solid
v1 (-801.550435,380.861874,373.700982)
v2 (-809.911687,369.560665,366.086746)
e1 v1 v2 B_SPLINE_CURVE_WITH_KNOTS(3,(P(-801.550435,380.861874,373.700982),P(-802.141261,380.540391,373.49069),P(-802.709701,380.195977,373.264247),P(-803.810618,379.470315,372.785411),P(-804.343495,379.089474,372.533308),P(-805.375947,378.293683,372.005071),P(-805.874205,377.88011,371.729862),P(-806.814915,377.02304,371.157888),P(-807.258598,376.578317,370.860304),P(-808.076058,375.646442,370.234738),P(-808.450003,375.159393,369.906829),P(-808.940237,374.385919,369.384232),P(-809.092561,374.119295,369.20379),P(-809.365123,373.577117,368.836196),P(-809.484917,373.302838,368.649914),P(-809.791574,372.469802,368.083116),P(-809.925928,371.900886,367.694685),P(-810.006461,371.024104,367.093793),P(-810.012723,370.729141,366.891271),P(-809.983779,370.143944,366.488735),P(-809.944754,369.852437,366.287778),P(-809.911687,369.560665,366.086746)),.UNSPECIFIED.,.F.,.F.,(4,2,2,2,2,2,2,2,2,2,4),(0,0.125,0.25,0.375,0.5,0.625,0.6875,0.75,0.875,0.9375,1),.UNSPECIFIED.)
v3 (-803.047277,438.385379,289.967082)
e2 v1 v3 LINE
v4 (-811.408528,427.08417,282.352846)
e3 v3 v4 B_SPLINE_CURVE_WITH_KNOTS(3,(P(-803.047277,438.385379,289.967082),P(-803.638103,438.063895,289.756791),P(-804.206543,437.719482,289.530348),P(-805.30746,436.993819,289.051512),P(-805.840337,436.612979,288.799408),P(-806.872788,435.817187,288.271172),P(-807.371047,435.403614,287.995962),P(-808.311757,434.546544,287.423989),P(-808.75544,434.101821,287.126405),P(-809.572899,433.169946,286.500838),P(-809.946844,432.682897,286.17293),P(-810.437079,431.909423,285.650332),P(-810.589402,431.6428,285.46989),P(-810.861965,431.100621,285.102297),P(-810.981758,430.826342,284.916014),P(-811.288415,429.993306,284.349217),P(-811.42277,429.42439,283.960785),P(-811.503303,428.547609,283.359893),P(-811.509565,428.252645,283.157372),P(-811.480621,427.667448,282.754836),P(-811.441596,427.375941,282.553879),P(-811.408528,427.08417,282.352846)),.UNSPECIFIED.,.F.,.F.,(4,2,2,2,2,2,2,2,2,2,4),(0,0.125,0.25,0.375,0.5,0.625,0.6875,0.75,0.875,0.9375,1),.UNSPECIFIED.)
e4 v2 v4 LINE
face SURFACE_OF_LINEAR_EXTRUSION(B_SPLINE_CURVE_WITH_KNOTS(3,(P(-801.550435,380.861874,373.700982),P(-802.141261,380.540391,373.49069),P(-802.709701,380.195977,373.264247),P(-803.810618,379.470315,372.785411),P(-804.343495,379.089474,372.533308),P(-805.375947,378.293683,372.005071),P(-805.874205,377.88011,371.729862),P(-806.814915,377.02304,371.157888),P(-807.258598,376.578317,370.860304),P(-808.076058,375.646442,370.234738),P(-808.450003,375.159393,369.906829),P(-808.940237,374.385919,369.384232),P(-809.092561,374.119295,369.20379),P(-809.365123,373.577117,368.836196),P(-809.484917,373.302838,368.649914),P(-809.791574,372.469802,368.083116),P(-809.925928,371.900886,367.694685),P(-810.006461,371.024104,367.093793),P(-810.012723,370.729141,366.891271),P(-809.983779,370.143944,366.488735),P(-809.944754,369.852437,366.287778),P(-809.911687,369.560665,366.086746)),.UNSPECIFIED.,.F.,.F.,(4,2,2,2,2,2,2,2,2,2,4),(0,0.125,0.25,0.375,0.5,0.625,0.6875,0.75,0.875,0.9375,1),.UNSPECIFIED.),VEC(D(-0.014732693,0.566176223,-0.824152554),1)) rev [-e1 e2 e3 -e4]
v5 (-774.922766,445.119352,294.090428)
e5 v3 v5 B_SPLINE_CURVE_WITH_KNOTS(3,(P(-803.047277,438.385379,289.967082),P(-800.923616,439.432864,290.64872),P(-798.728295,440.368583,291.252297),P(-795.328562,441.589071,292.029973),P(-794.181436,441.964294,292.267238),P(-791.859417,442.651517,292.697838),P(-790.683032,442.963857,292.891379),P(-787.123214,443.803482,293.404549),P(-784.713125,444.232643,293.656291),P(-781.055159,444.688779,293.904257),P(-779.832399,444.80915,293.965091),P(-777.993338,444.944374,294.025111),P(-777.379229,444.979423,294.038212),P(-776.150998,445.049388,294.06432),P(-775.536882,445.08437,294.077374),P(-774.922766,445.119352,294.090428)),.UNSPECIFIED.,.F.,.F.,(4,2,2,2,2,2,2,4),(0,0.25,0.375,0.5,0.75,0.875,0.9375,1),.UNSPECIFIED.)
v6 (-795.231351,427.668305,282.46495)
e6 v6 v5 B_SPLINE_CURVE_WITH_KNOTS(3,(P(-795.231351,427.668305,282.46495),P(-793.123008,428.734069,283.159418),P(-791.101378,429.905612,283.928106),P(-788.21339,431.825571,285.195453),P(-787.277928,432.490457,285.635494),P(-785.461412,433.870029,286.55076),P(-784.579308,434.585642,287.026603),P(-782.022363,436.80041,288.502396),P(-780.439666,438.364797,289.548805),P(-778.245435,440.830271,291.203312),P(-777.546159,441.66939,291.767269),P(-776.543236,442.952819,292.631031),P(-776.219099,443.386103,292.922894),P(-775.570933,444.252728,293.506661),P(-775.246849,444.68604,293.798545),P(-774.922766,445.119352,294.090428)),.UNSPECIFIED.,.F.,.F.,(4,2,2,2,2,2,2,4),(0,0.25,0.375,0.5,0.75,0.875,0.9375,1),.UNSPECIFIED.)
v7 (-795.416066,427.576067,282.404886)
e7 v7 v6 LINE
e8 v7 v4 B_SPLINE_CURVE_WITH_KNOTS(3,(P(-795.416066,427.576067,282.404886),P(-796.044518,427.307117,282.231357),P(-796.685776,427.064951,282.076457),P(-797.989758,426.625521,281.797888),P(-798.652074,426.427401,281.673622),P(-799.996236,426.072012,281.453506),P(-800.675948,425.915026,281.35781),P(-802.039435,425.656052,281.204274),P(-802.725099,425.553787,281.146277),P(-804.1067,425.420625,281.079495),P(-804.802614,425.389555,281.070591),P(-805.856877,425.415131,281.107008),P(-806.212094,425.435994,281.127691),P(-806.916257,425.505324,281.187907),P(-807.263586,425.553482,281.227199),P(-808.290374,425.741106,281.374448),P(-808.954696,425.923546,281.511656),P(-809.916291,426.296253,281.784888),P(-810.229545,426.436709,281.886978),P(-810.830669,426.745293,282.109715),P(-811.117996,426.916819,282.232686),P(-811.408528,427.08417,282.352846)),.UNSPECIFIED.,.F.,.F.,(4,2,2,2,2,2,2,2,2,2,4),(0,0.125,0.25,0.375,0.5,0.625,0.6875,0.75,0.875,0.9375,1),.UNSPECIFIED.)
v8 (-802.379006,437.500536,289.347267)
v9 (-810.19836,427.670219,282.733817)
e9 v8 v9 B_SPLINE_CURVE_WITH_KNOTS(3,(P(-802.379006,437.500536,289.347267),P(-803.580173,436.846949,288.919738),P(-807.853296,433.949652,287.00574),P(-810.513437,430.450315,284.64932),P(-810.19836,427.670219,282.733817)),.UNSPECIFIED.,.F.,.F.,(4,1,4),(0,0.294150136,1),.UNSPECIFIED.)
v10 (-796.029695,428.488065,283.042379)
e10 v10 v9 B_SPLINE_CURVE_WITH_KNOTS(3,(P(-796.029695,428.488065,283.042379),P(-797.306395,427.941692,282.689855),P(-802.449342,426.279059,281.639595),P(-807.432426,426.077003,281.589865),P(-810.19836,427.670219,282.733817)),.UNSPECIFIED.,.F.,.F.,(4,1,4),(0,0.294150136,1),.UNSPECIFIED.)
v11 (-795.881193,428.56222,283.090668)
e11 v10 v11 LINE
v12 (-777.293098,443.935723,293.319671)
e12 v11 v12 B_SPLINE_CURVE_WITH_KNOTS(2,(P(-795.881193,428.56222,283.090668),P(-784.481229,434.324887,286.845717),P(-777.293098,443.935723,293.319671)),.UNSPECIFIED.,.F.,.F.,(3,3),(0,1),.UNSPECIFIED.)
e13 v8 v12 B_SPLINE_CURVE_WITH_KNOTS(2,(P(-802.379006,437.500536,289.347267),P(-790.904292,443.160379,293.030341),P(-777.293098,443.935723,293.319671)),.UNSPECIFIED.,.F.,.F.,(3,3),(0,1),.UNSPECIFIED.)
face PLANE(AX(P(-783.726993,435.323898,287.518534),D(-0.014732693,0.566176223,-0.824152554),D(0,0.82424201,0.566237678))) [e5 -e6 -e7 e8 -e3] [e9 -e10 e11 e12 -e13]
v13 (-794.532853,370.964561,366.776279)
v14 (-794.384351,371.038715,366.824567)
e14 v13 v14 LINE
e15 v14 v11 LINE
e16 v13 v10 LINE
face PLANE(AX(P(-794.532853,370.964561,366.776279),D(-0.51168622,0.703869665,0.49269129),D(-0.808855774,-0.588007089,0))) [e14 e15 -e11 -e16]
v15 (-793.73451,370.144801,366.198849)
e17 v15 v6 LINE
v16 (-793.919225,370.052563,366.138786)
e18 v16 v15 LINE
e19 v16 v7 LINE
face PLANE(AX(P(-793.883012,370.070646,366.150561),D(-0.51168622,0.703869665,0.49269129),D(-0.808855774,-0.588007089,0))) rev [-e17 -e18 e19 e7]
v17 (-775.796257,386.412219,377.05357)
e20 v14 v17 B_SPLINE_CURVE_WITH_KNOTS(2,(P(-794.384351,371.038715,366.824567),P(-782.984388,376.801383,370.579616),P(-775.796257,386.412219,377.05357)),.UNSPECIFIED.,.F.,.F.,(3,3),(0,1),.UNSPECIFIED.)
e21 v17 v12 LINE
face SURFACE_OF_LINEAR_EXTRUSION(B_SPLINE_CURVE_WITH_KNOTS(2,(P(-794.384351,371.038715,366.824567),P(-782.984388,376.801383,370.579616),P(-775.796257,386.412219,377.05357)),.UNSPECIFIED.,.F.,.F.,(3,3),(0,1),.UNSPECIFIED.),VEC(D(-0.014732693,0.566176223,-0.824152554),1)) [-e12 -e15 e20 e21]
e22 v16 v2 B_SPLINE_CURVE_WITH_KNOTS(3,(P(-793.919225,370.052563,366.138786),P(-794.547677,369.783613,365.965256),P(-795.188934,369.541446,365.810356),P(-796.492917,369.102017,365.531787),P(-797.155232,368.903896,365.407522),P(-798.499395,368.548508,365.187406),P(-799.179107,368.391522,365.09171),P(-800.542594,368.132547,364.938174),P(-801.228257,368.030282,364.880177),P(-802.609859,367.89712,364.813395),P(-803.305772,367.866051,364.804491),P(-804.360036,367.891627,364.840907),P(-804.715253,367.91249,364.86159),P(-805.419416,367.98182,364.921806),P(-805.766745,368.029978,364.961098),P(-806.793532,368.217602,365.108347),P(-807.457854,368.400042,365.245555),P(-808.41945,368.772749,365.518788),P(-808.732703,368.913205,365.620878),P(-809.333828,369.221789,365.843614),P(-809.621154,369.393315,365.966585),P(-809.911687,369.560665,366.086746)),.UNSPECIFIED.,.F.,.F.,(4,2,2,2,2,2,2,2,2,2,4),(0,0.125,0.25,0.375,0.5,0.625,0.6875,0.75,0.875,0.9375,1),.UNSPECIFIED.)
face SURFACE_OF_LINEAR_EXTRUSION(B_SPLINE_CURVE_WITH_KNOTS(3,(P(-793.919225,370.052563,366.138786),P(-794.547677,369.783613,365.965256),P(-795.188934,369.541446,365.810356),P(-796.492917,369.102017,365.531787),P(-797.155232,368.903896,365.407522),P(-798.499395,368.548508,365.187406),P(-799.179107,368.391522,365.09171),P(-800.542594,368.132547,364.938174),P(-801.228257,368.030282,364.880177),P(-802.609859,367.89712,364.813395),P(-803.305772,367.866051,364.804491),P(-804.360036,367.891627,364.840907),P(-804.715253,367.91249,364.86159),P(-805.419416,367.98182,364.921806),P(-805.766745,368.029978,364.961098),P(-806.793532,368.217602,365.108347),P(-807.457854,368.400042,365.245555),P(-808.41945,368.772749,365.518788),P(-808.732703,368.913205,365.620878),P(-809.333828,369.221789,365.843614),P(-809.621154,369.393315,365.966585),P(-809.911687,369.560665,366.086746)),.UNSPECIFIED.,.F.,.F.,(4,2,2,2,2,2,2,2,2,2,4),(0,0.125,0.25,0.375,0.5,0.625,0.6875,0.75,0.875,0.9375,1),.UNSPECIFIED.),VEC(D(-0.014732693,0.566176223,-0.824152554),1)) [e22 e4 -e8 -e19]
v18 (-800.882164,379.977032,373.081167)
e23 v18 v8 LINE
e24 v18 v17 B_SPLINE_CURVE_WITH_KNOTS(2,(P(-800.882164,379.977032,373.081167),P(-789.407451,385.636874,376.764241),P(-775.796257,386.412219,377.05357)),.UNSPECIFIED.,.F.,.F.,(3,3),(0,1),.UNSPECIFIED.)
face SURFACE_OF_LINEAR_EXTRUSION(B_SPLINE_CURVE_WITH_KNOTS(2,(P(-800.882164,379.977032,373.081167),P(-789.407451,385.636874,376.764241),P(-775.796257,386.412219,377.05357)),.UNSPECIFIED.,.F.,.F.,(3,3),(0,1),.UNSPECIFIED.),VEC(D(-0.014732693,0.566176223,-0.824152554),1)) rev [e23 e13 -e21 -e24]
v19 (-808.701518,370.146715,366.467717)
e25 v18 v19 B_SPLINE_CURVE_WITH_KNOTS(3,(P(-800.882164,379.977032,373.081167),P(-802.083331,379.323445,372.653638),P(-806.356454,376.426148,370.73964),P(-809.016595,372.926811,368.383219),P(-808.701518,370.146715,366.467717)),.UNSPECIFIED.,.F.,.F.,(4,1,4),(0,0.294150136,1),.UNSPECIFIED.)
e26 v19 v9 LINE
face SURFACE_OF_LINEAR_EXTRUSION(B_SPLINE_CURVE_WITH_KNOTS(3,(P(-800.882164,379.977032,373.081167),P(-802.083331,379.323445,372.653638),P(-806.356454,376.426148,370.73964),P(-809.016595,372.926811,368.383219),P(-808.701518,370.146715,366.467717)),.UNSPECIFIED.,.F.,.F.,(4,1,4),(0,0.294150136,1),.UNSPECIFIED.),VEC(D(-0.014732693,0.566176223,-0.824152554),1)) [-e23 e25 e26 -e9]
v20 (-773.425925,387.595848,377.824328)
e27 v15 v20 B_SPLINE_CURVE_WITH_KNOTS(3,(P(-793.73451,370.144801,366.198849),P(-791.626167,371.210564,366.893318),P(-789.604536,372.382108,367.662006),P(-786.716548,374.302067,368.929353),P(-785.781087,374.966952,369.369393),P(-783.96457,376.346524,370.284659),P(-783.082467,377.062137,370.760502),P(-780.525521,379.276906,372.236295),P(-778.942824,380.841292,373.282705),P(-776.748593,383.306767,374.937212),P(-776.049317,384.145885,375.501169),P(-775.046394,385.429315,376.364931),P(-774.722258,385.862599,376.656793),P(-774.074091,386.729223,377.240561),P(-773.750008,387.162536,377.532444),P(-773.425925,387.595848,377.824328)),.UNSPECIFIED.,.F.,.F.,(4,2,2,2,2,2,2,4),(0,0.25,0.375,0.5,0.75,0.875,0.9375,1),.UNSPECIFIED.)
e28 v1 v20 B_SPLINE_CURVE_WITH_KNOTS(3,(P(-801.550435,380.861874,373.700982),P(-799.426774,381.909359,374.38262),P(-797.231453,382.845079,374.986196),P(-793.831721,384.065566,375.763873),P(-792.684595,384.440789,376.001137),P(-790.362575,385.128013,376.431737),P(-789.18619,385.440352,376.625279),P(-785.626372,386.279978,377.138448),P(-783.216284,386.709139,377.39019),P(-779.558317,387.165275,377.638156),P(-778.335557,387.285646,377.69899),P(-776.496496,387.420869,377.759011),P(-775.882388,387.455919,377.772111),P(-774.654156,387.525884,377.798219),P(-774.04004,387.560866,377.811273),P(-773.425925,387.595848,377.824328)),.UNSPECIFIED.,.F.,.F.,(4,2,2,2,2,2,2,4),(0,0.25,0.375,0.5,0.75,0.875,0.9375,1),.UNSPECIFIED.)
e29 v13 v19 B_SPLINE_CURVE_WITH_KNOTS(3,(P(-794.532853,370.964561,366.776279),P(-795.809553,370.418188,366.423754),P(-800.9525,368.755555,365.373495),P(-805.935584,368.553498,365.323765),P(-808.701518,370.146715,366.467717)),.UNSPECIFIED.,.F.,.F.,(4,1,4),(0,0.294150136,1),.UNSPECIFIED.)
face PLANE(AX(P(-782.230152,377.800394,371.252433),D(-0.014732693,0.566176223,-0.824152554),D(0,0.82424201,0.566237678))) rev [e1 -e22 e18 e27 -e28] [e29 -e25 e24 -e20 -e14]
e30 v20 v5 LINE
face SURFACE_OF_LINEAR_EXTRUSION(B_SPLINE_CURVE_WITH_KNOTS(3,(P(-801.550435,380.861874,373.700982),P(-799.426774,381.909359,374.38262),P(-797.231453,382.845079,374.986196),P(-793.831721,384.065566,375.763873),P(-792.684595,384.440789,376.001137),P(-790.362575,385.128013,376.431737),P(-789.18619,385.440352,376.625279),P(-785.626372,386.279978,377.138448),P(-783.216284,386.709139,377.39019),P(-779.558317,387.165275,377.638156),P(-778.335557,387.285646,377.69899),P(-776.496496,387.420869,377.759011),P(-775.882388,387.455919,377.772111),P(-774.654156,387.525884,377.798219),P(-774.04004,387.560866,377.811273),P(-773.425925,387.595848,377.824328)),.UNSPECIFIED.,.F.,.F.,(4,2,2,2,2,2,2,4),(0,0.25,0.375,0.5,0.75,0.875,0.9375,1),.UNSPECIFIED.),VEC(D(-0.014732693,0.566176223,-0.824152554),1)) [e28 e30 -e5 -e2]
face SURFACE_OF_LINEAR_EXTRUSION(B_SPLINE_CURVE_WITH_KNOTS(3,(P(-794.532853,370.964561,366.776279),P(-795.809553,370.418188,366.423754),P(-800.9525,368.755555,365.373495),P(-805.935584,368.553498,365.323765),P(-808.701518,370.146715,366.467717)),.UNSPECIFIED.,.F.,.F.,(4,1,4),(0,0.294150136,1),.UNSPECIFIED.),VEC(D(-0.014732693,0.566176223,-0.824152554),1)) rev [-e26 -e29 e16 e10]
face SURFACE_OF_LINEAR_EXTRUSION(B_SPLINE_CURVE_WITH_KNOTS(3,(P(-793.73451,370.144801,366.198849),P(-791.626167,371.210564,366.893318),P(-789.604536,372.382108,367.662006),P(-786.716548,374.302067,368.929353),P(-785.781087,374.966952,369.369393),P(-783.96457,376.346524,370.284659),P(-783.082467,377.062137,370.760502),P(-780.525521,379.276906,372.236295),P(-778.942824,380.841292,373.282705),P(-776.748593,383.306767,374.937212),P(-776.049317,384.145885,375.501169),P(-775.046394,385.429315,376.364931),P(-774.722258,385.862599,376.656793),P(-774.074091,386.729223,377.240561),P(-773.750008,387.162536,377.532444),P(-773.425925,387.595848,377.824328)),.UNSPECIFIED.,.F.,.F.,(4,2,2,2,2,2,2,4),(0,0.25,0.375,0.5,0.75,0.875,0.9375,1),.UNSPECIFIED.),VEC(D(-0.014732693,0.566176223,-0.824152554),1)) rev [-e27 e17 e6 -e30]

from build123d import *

# Parameters (mm, degrees)
BOSS_EXTRUDE1_DEPTH      = 91.359952
BOSS_EXTRUDE1_DEPTH_BACK = 91.359952
SKETCH1_R                = 6.35
SKETCH2_R                = 5.1943
CUT_EXTRUDE1_DEPTH       = 1020.644650611
EXTRUDE_THIN2_START      = -101.6
EXTRUDE_THIN2_DEPTH      = 101.6


# Read off the part's stored shape, not the designer's step: Extrude-Thin2
with BuildPart() as part:
    # Sketch1 → Boss-Extrude1 (new, two sides: drawn at the far end of the back side and taken through both)
    with BuildSketch(Plane(origin=(-797.858372093, 381.268468163, 361.489360836), x_dir=(0.9998902886126457, 0.009608155882865862, -0.011273600962007019), z_dir=(-0.014732692778449213, 0.5661762234602228, -0.8241525536888277)).offset(-BOSS_EXTRUDE1_DEPTH_BACK)):
        with Locations(Location((0, 0, 0), (0, 0, 90.088001086))):
            Circle(SKETCH1_R)
    extrude(amount=BOSS_EXTRUDE1_DEPTH + BOSS_EXTRUDE1_DEPTH_BACK)

    # Sketch2 → Cut-Extrude1 (cut, through all)
    with BuildSketch(Plane(origin=(-0.310230962, 11.922151452, -17.354440468), x_dir=(0.999890288612646, 0.009608155882749703, -0.011273600962086832), z_dir=(-0.014732692778449222, 0.5661762234602224, -0.8241525536888279))):
        with Locations(Location((-798.182837875, -520.172934132, 0), (0, 0, 270.088001086))):
            Circle(SKETCH2_R)
    extrude(amount=-CUT_EXTRUDE1_DEPTH, mode=Mode.SUBTRACT)


with BuildPart() as body_2:
    # Extrude-Thin2 outline → Extrude-Thin2 (new body)
    with BuildSketch(Plane(origin=(-0.310230962, 11.922151452, -17.354440468), x_dir=(-0.9998914679921496, -0.00834220575504257, 0.012143304313270938), z_dir=(-0.014732692778449226, 0.5661762234602217, -0.8241525536888284)).offset(EXTRUDE_THIN2_START)):
        with BuildLine():
            add(Edge.make_bspline(
                [(795.007403943, 512.444480964), (792.898832326, 513.716162183), (790.876982299, 515.117057901), (787.988681037, 517.417188527), (787.053117975, 518.21438231), (785.23640397, 519.869741584), (784.354204701, 520.729019996), (781.796982108, 523.3901752), (780.214112798, 525.272124548), (778.019643962, 528.241116236), (777.320291883, 529.252086912), (776.31726013, 530.799037937), (775.993088295, 531.321432242), (775.34485148, 532.366291694), (775.020733072, 532.88872142), (774.696614665, 533.411151146)],
                knots=[0, 0, 0, 0, 0.25, 0.25, 0.375, 0.375, 0.5, 0.5, 0.75, 0.75, 0.875, 0.875, 0.9375, 0.9375, 1, 1, 1, 1], degree=3))
            Line((795.007403943, 512.444480964), (795.192139039, 512.334444488))
            add(Edge.make_bspline(
                [(795.192139039, 512.334444488), (795.820659251, 512.014505469), (796.461986169, 511.727191335), (797.766110641, 511.207259179), (798.428497889, 510.973595907), (799.772806417, 510.556032006), (800.452591935, 510.372450513), (801.816227189, 510.07205513), (802.501964688, 509.954924004), (803.88371636, 509.807351912), (804.579705649, 509.776701036), (805.634083311, 509.818402312), (805.989339161, 509.847310141), (806.693578465, 509.938551358), (807.040945003, 510.000493885), (808.067844122, 510.238519077), (808.732238224, 510.466586402), (809.693938159, 510.928501806), (810.007225559, 511.10207874), (810.608415369, 511.482548524), (810.895772864, 511.693557881), (811.186337014, 511.899534791)],
                knots=[0, 0, 0, 0, 0.125, 0.125, 0.25, 0.25, 0.375, 0.375, 0.5, 0.5, 0.625, 0.625, 0.6875, 0.6875, 0.75, 0.75, 0.875, 0.875, 0.9375, 0.9375, 1, 1, 1, 1], degree=3))
            add(Edge.make_bspline(
                [(802.824178055, 525.525933285), (803.415067853, 525.141877964), (803.983569629, 524.729777367), (805.084606371, 523.860520869), (805.61754116, 523.403865824), (806.650104746, 522.448833612), (807.148417232, 521.952115017), (808.08922944, 520.921809356), (808.532960793, 520.386746599), (809.350508798, 519.264437037), (809.724494326, 518.677316278), (810.21478219, 517.743872092), (810.367122157, 517.421936823), (810.63971425, 516.766905357), (810.759520718, 516.435352914), (811.066210954, 515.427787282), (811.200580221, 514.738918347), (811.281121537, 513.675990605), (811.287384359, 513.318194206), (811.258437226, 512.607919011), (811.219408013, 512.253857446), (811.186337014, 511.899534791)],
                knots=[0, 0, 0, 0, 0.125, 0.125, 0.25, 0.25, 0.375, 0.375, 0.5, 0.5, 0.625, 0.625, 0.6875, 0.6875, 0.75, 0.75, 0.875, 0.875, 0.9375, 0.9375, 1, 1, 1, 1], degree=3))
            add(Edge.make_bspline(
                [(802.824178055, 525.525933285), (800.700286301, 526.77528344), (798.504727379, 527.888310329), (795.104625441, 529.334637361), (793.957375, 529.778259938), (791.635103666, 530.588520593), (790.458590691, 530.95555421), (786.898386756, 531.938184836), (784.488036247, 532.434463461), (780.829672903, 532.950837392), (779.606779988, 533.084498644), (777.76751946, 533.229941481), (777.153344334, 533.266248665), (775.9249795, 533.338699906), (775.310797082, 533.374925526), (774.696614665, 533.411151146)],
                knots=[0, 0, 0, 0, 0.25, 0.25, 0.375, 0.375, 0.5, 0.5, 0.75, 0.75, 0.875, 0.875, 0.9375, 0.9375, 1, 1, 1, 1], degree=3))
        make_face()
        with BuildLine():
            Line((795.805834227, 513.447123796), (795.657315978, 513.5355879))
            add(Edge.make_bspline(
                [(795.657315978, 513.5355879), (784.256115309, 520.41167093), (777.067204021, 531.999122223)],
                knots=[0, 0, 0, 1, 1, 1], degree=2))
            add(Edge.make_bspline(
                [(802.155834227, 524.445646424), (790.679875453, 531.196221565), (777.067204021, 531.999122223)],
                knots=[0, 0, 0, 1, 1, 1], degree=2))
            add(Edge.make_bspline(
                [(802.155834227, 524.445646424), (803.357131939, 523.664849768), (807.630718362, 520.192997769), (810.29114838, 515.974403166), (809.976037151, 512.598301742)],
                knots=[0, 0, 0, 0, 0.294150136, 1, 1, 1, 1], degree=3))
            add(Edge.make_bspline(
                [(795.805834227, 513.447123796), (797.082672823, 512.797167788), (802.226178064, 510.832059381), (807.209803167, 510.637356701), (809.976037151, 512.598301742)],
                knots=[0, 0, 0, 0, 0.294150136, 1, 1, 1, 1], degree=3))
        make_face(mode=Mode.SUBTRACT)
    extrude(amount=EXTRUDE_THIN2_DEPTH)


solid = body_2.part
